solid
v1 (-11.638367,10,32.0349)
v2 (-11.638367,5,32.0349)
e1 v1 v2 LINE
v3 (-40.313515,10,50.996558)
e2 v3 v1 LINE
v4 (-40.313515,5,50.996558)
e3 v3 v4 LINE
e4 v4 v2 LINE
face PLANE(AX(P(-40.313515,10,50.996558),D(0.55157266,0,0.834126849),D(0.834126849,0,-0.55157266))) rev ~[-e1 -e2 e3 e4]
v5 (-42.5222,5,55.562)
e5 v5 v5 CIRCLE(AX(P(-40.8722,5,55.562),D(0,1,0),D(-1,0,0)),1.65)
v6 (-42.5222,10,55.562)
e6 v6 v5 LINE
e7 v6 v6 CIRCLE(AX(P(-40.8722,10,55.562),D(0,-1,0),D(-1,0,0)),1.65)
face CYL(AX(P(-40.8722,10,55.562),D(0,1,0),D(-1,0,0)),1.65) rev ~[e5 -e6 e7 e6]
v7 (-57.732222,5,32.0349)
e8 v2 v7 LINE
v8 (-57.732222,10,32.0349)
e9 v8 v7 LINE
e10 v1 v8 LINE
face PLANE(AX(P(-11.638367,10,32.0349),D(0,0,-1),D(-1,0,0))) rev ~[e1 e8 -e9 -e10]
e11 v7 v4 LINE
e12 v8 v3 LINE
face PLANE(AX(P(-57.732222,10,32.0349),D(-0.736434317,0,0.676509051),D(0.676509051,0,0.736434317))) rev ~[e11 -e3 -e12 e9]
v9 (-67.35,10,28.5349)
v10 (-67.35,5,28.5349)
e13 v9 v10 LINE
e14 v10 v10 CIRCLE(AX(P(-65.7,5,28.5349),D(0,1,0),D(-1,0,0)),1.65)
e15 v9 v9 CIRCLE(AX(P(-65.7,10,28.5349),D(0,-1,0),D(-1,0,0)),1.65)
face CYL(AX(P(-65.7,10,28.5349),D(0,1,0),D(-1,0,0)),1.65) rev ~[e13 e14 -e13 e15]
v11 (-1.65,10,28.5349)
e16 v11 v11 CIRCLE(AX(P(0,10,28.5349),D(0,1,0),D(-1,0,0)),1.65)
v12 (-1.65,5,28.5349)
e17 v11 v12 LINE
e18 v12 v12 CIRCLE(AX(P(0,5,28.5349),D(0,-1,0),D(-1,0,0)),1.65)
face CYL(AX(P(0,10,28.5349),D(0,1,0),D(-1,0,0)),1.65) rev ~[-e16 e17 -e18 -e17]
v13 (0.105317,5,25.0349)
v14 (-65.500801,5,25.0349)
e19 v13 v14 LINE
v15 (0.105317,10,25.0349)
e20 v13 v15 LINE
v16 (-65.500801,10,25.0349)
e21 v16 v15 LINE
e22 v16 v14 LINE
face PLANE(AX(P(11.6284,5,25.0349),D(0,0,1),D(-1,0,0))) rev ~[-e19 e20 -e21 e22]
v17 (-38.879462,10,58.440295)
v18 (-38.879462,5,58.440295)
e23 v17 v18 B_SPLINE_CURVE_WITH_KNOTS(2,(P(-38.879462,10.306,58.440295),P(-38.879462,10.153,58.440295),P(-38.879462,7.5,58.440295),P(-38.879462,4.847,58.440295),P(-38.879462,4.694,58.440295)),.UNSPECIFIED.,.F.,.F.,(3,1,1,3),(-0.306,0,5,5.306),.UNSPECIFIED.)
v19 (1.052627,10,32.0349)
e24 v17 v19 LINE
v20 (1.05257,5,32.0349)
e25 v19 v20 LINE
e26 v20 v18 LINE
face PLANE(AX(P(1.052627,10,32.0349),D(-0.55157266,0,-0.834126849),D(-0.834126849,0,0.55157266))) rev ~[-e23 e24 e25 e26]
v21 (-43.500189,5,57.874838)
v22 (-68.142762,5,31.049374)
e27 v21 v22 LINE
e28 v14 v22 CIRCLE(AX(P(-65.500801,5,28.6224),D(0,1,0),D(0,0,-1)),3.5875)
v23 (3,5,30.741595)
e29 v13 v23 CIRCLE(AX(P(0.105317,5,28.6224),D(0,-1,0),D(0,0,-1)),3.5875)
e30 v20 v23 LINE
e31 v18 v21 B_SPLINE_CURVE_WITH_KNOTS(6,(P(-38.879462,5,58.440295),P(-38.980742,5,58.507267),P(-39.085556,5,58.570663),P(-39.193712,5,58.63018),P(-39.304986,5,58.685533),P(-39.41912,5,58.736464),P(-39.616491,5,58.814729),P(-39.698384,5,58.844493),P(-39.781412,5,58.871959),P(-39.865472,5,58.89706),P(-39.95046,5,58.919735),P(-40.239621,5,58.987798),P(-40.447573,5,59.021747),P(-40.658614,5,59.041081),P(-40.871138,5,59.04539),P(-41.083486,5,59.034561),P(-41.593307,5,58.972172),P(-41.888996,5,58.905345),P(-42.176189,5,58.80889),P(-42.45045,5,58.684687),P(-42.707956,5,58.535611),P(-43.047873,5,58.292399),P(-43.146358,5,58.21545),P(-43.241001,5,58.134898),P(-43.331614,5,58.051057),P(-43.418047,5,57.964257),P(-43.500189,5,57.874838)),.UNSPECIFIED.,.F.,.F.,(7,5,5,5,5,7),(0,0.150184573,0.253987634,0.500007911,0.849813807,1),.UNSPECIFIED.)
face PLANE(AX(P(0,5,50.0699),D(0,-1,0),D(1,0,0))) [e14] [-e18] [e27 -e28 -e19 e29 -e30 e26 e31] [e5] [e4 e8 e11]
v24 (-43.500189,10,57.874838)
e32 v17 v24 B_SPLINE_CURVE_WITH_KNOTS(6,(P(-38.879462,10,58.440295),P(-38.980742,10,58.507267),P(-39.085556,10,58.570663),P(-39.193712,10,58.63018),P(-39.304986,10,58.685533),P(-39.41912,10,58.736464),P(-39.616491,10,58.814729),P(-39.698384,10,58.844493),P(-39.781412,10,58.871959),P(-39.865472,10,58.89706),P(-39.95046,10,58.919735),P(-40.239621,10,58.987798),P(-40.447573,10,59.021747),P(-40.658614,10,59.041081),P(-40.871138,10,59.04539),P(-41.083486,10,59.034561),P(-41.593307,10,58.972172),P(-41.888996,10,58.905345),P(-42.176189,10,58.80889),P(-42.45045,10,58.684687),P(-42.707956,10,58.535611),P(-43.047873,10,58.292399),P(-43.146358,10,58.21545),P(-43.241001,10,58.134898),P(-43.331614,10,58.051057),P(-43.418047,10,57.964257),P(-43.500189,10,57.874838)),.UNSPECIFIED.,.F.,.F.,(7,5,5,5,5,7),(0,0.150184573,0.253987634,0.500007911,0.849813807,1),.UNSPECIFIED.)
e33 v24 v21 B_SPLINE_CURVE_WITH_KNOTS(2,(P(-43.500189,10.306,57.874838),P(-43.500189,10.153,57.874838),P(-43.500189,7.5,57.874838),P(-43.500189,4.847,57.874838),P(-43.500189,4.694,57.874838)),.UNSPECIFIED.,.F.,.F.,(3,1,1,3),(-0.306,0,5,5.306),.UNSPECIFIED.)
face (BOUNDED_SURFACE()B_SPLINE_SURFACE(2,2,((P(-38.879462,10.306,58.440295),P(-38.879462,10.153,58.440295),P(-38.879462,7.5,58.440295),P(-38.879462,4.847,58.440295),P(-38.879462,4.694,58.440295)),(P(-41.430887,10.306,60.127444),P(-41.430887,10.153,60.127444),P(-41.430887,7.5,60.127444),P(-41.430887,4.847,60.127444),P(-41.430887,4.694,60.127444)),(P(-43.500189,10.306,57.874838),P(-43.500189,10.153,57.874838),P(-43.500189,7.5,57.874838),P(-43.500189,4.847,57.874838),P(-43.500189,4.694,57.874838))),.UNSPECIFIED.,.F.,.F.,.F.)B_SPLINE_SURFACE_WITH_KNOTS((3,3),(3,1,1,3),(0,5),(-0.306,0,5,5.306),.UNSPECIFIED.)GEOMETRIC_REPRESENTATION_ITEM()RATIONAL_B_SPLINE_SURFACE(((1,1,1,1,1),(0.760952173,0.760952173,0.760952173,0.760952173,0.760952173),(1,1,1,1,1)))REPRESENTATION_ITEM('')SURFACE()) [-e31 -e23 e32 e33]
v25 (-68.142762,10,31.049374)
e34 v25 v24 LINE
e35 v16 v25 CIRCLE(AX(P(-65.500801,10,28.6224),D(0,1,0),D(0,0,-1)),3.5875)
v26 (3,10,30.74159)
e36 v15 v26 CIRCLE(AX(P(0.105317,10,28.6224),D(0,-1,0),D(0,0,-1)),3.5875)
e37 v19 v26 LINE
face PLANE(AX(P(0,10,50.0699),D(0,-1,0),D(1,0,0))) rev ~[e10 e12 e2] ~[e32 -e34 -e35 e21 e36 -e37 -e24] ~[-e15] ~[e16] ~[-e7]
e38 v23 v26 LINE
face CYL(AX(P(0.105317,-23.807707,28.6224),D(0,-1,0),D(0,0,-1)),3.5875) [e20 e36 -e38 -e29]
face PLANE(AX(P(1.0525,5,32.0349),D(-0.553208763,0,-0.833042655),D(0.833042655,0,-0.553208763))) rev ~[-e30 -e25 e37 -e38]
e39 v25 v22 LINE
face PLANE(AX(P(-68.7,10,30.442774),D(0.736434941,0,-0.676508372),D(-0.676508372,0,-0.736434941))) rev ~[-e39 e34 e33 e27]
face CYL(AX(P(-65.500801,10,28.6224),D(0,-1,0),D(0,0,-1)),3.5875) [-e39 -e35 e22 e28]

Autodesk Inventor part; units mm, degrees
ref_plane "YZ Plane" through (0, 0, 0) normal (1, 0, 0) x (0, 1, 0)
ref_plane "XZ Plane" through (0, 0, 0) normal (0, 1, 0) x (-1, 0, 0)
ref_plane "XY Plane" through (0, 0, 0) normal (0, 0, 1) x (1, 0, 0)
sketch "Sketch1" plane through (0, 0, 0) normal (0, 1, 0) x (-1, 0, 0)
  line L0 (0, 21.535) -> (65.7, 21.535)
  line L1 (0, 21.535) -> (40.8722, -5.4921)
  line L2 (0, 21.535) -> (49, 21.535) construction
  line L3 (40.8722, -5.4921) -> (65.7, 21.535)
  line L4 (65.7, 21.535) -> (68.7, 21.535)
  line L5 (68.7, 21.535) -> (0, 21.535)
  line L6 (0, 21.535) -> (-3, 21.535)
  line L7 (40.8722, -5.4921) -> (43.3746, -7.1468)
  line L8 (65.7, 21.535) -> (38.8426, -7.7015)
  line L9 (137.4, 18.035) -> (137.4, 25.035)
  line L10 (137.4, 25.035) -> (0, 25.035)
  line L11 (0, 25.035) -> (0, 18.035)
  line L12 (0, 18.035) -> (137.4, 18.035)
  line L13 (137.4, 18.035) -> (0, 25.035) construction
  line L14 (137.4, 25.035) -> (0, 18.035) construction
  line L15 (93.1053, 46.1943) -> (87.9503, 50.9298)
  line L16 (87.9503, 50.9298) -> (38.2947, -3.1243)
  line L17 (38.2947, -3.1243) -> (43.4497, -7.8599)
  line L18 (43.4497, -7.8599) -> (93.1053, 46.1943)
  line L19 (93.1053, 46.1943) -> (38.2947, -3.1243) construction
  line L20 (87.9503, 50.9298) -> (43.4497, -7.8599) construction
  line L21 (79.8139, -35.4386) -> (83.6749, -29.5997)
  line L22 (83.6749, -29.5997) -> (1.9305, 24.4544)
  line L23 (1.9305, 24.4544) -> (-1.9305, 18.6155)
  line L24 (-1.9305, 18.6155) -> (79.8139, -35.4386)
  line L25 (79.8139, -35.4386) -> (1.9305, 24.4544) construction
  line L26 (83.6749, -29.5997) -> (-1.9305, 18.6155) construction
  line L27 (38.8426, -7.7015) -> (38.4743, -8.1025)
  line L28 (68.7, 21.535) -> (68.7, 25.035)
  line L29 (68.7, 21.535) -> (68.7, 18.035)
  line L30 (0, 25.035) -> (-3, 25.035)
  line L31 (-3, 25.035) -> (-3, 18.035)
  line L32 (-3, 18.035) -> (0, 18.035)
  line L33 (50.67, 0) -> (41.4309, -10.0576)
  circle A0 centre (65.7, 21.535) radius 1.65
  circle A1 centre (40.8722, -5.4921) radius 1.65
  circle A2 centre (0, 21.535) radius 1.65
  point P0 (0, 0)
  point P1 (40.3135, -0.9267)
  point P2 (11.6384, 18.035)
  point P3 (57.7322, 18.035)
  point P4 (-1.0525, 18.035)
  point P5 (73.6678, 25.035)
  dimension "d0" = 65.7
  dimension "d2" = 33.475
  dimension "d3" = 3
  dimension "d4" = 3
  dimension "d7" = 39.7
  dimension "d8" = 7
  dimension "d9" = 7
  dimension "d10" = 7
  dimension "d11" = 3.3
  dimension "d12" = 3.3
  dimension "d13" = 3.3
extrude "Extrusion1" add sketch "Sketch1" along normal blind 5 contours A2 L23 L22 L0 | L0 L22 L12 L1 A2 | L1 L12 L11 A2 | A2 L23 L24 L32 L31 L6 | L6 L31 L30 L11 A2 | L11 L10 L16 L0 L22 L23 A2 | L11 L32 L24 L23 A2 | L0 L16 L12 L22 | L12 L22 L16 L17 A1 L1 | L1 A1 L8 L27 L24 L32 L12 | L16 L10 L28 L4 A0 L0 | L0 A0 L3 L12 L16 | L12 L3 L22 L16 | L22 L3 A1 L17 L16 | A1 L17 L33 L24 L27 L8 | L10 L18 L29 L28 | L4 L29 L18 L12 L3 A0 | L12 L18 L22 L3 | L22 L18 L17 A1 L3
sketch "Sketch2" plane through (0, 5, 0) normal (0, 1, 0) x (1, 0, 0)
  line L0 (1.0525, -18.035) -> (-41.4309, 10.0576) projected
  line L1 (-41.4309, 10.0576) -> (11.6284, -25.035)
  line L2 (-41.4309, 10.0576) -> (22.1833, 10.0576) construction
  line L3 (-73.6678, -25.035) -> (3, -25.035) projected
  line L4 (11.6284, -25.035) -> (3, -25.035)
  line L5 (3, -25.035) -> (3, -18.035) projected
  line L6 (3, -18.035) -> (3, -25.035)
  point P0 (0, 0)
  point P1 (3, -19.3283)
  dimension "d16" = 33.48
extrude "Extrusion2" add sketch "Sketch2" against normal up to surface (5 mm away)
sketch "Sketch3" plane through (0, 5, 0) normal (0, 1, 0) x (1, 0, 0)
  line L0 (3, -18.035) -> (1.0525, -18.035) projected
  line L1 (11.6284, -25.035) -> (3, -19.3283) projected
  line L2 (1.0525, -18.035) -> (3, -19.3283)
  line L3 (3, -19.3283) -> (3, -18.035)
  line L4 (3, -18.035) -> (1.0525, -18.035)
  point P0 (0, 0)
extrude "Extrusion3" cut sketch "Sketch3" against normal blind 10
fillet "Fillet1" radius 3.5875 2 edges at (-73.6678, 2.5, 25.035) (-41.4309, 2.5, -10.0576)
fillet "Fillet2" radius 3.5875 1 edges at (11.6284, 2.5, 25.035)
move or copy body "Move Body1" bodies to move or copy 1 copy no rotation origin (0, 0, 0) rotation axis (1, 0, 0) rotation angle 180 translate (0, 10, 50.0699)
properties part number "ghiMirror"
